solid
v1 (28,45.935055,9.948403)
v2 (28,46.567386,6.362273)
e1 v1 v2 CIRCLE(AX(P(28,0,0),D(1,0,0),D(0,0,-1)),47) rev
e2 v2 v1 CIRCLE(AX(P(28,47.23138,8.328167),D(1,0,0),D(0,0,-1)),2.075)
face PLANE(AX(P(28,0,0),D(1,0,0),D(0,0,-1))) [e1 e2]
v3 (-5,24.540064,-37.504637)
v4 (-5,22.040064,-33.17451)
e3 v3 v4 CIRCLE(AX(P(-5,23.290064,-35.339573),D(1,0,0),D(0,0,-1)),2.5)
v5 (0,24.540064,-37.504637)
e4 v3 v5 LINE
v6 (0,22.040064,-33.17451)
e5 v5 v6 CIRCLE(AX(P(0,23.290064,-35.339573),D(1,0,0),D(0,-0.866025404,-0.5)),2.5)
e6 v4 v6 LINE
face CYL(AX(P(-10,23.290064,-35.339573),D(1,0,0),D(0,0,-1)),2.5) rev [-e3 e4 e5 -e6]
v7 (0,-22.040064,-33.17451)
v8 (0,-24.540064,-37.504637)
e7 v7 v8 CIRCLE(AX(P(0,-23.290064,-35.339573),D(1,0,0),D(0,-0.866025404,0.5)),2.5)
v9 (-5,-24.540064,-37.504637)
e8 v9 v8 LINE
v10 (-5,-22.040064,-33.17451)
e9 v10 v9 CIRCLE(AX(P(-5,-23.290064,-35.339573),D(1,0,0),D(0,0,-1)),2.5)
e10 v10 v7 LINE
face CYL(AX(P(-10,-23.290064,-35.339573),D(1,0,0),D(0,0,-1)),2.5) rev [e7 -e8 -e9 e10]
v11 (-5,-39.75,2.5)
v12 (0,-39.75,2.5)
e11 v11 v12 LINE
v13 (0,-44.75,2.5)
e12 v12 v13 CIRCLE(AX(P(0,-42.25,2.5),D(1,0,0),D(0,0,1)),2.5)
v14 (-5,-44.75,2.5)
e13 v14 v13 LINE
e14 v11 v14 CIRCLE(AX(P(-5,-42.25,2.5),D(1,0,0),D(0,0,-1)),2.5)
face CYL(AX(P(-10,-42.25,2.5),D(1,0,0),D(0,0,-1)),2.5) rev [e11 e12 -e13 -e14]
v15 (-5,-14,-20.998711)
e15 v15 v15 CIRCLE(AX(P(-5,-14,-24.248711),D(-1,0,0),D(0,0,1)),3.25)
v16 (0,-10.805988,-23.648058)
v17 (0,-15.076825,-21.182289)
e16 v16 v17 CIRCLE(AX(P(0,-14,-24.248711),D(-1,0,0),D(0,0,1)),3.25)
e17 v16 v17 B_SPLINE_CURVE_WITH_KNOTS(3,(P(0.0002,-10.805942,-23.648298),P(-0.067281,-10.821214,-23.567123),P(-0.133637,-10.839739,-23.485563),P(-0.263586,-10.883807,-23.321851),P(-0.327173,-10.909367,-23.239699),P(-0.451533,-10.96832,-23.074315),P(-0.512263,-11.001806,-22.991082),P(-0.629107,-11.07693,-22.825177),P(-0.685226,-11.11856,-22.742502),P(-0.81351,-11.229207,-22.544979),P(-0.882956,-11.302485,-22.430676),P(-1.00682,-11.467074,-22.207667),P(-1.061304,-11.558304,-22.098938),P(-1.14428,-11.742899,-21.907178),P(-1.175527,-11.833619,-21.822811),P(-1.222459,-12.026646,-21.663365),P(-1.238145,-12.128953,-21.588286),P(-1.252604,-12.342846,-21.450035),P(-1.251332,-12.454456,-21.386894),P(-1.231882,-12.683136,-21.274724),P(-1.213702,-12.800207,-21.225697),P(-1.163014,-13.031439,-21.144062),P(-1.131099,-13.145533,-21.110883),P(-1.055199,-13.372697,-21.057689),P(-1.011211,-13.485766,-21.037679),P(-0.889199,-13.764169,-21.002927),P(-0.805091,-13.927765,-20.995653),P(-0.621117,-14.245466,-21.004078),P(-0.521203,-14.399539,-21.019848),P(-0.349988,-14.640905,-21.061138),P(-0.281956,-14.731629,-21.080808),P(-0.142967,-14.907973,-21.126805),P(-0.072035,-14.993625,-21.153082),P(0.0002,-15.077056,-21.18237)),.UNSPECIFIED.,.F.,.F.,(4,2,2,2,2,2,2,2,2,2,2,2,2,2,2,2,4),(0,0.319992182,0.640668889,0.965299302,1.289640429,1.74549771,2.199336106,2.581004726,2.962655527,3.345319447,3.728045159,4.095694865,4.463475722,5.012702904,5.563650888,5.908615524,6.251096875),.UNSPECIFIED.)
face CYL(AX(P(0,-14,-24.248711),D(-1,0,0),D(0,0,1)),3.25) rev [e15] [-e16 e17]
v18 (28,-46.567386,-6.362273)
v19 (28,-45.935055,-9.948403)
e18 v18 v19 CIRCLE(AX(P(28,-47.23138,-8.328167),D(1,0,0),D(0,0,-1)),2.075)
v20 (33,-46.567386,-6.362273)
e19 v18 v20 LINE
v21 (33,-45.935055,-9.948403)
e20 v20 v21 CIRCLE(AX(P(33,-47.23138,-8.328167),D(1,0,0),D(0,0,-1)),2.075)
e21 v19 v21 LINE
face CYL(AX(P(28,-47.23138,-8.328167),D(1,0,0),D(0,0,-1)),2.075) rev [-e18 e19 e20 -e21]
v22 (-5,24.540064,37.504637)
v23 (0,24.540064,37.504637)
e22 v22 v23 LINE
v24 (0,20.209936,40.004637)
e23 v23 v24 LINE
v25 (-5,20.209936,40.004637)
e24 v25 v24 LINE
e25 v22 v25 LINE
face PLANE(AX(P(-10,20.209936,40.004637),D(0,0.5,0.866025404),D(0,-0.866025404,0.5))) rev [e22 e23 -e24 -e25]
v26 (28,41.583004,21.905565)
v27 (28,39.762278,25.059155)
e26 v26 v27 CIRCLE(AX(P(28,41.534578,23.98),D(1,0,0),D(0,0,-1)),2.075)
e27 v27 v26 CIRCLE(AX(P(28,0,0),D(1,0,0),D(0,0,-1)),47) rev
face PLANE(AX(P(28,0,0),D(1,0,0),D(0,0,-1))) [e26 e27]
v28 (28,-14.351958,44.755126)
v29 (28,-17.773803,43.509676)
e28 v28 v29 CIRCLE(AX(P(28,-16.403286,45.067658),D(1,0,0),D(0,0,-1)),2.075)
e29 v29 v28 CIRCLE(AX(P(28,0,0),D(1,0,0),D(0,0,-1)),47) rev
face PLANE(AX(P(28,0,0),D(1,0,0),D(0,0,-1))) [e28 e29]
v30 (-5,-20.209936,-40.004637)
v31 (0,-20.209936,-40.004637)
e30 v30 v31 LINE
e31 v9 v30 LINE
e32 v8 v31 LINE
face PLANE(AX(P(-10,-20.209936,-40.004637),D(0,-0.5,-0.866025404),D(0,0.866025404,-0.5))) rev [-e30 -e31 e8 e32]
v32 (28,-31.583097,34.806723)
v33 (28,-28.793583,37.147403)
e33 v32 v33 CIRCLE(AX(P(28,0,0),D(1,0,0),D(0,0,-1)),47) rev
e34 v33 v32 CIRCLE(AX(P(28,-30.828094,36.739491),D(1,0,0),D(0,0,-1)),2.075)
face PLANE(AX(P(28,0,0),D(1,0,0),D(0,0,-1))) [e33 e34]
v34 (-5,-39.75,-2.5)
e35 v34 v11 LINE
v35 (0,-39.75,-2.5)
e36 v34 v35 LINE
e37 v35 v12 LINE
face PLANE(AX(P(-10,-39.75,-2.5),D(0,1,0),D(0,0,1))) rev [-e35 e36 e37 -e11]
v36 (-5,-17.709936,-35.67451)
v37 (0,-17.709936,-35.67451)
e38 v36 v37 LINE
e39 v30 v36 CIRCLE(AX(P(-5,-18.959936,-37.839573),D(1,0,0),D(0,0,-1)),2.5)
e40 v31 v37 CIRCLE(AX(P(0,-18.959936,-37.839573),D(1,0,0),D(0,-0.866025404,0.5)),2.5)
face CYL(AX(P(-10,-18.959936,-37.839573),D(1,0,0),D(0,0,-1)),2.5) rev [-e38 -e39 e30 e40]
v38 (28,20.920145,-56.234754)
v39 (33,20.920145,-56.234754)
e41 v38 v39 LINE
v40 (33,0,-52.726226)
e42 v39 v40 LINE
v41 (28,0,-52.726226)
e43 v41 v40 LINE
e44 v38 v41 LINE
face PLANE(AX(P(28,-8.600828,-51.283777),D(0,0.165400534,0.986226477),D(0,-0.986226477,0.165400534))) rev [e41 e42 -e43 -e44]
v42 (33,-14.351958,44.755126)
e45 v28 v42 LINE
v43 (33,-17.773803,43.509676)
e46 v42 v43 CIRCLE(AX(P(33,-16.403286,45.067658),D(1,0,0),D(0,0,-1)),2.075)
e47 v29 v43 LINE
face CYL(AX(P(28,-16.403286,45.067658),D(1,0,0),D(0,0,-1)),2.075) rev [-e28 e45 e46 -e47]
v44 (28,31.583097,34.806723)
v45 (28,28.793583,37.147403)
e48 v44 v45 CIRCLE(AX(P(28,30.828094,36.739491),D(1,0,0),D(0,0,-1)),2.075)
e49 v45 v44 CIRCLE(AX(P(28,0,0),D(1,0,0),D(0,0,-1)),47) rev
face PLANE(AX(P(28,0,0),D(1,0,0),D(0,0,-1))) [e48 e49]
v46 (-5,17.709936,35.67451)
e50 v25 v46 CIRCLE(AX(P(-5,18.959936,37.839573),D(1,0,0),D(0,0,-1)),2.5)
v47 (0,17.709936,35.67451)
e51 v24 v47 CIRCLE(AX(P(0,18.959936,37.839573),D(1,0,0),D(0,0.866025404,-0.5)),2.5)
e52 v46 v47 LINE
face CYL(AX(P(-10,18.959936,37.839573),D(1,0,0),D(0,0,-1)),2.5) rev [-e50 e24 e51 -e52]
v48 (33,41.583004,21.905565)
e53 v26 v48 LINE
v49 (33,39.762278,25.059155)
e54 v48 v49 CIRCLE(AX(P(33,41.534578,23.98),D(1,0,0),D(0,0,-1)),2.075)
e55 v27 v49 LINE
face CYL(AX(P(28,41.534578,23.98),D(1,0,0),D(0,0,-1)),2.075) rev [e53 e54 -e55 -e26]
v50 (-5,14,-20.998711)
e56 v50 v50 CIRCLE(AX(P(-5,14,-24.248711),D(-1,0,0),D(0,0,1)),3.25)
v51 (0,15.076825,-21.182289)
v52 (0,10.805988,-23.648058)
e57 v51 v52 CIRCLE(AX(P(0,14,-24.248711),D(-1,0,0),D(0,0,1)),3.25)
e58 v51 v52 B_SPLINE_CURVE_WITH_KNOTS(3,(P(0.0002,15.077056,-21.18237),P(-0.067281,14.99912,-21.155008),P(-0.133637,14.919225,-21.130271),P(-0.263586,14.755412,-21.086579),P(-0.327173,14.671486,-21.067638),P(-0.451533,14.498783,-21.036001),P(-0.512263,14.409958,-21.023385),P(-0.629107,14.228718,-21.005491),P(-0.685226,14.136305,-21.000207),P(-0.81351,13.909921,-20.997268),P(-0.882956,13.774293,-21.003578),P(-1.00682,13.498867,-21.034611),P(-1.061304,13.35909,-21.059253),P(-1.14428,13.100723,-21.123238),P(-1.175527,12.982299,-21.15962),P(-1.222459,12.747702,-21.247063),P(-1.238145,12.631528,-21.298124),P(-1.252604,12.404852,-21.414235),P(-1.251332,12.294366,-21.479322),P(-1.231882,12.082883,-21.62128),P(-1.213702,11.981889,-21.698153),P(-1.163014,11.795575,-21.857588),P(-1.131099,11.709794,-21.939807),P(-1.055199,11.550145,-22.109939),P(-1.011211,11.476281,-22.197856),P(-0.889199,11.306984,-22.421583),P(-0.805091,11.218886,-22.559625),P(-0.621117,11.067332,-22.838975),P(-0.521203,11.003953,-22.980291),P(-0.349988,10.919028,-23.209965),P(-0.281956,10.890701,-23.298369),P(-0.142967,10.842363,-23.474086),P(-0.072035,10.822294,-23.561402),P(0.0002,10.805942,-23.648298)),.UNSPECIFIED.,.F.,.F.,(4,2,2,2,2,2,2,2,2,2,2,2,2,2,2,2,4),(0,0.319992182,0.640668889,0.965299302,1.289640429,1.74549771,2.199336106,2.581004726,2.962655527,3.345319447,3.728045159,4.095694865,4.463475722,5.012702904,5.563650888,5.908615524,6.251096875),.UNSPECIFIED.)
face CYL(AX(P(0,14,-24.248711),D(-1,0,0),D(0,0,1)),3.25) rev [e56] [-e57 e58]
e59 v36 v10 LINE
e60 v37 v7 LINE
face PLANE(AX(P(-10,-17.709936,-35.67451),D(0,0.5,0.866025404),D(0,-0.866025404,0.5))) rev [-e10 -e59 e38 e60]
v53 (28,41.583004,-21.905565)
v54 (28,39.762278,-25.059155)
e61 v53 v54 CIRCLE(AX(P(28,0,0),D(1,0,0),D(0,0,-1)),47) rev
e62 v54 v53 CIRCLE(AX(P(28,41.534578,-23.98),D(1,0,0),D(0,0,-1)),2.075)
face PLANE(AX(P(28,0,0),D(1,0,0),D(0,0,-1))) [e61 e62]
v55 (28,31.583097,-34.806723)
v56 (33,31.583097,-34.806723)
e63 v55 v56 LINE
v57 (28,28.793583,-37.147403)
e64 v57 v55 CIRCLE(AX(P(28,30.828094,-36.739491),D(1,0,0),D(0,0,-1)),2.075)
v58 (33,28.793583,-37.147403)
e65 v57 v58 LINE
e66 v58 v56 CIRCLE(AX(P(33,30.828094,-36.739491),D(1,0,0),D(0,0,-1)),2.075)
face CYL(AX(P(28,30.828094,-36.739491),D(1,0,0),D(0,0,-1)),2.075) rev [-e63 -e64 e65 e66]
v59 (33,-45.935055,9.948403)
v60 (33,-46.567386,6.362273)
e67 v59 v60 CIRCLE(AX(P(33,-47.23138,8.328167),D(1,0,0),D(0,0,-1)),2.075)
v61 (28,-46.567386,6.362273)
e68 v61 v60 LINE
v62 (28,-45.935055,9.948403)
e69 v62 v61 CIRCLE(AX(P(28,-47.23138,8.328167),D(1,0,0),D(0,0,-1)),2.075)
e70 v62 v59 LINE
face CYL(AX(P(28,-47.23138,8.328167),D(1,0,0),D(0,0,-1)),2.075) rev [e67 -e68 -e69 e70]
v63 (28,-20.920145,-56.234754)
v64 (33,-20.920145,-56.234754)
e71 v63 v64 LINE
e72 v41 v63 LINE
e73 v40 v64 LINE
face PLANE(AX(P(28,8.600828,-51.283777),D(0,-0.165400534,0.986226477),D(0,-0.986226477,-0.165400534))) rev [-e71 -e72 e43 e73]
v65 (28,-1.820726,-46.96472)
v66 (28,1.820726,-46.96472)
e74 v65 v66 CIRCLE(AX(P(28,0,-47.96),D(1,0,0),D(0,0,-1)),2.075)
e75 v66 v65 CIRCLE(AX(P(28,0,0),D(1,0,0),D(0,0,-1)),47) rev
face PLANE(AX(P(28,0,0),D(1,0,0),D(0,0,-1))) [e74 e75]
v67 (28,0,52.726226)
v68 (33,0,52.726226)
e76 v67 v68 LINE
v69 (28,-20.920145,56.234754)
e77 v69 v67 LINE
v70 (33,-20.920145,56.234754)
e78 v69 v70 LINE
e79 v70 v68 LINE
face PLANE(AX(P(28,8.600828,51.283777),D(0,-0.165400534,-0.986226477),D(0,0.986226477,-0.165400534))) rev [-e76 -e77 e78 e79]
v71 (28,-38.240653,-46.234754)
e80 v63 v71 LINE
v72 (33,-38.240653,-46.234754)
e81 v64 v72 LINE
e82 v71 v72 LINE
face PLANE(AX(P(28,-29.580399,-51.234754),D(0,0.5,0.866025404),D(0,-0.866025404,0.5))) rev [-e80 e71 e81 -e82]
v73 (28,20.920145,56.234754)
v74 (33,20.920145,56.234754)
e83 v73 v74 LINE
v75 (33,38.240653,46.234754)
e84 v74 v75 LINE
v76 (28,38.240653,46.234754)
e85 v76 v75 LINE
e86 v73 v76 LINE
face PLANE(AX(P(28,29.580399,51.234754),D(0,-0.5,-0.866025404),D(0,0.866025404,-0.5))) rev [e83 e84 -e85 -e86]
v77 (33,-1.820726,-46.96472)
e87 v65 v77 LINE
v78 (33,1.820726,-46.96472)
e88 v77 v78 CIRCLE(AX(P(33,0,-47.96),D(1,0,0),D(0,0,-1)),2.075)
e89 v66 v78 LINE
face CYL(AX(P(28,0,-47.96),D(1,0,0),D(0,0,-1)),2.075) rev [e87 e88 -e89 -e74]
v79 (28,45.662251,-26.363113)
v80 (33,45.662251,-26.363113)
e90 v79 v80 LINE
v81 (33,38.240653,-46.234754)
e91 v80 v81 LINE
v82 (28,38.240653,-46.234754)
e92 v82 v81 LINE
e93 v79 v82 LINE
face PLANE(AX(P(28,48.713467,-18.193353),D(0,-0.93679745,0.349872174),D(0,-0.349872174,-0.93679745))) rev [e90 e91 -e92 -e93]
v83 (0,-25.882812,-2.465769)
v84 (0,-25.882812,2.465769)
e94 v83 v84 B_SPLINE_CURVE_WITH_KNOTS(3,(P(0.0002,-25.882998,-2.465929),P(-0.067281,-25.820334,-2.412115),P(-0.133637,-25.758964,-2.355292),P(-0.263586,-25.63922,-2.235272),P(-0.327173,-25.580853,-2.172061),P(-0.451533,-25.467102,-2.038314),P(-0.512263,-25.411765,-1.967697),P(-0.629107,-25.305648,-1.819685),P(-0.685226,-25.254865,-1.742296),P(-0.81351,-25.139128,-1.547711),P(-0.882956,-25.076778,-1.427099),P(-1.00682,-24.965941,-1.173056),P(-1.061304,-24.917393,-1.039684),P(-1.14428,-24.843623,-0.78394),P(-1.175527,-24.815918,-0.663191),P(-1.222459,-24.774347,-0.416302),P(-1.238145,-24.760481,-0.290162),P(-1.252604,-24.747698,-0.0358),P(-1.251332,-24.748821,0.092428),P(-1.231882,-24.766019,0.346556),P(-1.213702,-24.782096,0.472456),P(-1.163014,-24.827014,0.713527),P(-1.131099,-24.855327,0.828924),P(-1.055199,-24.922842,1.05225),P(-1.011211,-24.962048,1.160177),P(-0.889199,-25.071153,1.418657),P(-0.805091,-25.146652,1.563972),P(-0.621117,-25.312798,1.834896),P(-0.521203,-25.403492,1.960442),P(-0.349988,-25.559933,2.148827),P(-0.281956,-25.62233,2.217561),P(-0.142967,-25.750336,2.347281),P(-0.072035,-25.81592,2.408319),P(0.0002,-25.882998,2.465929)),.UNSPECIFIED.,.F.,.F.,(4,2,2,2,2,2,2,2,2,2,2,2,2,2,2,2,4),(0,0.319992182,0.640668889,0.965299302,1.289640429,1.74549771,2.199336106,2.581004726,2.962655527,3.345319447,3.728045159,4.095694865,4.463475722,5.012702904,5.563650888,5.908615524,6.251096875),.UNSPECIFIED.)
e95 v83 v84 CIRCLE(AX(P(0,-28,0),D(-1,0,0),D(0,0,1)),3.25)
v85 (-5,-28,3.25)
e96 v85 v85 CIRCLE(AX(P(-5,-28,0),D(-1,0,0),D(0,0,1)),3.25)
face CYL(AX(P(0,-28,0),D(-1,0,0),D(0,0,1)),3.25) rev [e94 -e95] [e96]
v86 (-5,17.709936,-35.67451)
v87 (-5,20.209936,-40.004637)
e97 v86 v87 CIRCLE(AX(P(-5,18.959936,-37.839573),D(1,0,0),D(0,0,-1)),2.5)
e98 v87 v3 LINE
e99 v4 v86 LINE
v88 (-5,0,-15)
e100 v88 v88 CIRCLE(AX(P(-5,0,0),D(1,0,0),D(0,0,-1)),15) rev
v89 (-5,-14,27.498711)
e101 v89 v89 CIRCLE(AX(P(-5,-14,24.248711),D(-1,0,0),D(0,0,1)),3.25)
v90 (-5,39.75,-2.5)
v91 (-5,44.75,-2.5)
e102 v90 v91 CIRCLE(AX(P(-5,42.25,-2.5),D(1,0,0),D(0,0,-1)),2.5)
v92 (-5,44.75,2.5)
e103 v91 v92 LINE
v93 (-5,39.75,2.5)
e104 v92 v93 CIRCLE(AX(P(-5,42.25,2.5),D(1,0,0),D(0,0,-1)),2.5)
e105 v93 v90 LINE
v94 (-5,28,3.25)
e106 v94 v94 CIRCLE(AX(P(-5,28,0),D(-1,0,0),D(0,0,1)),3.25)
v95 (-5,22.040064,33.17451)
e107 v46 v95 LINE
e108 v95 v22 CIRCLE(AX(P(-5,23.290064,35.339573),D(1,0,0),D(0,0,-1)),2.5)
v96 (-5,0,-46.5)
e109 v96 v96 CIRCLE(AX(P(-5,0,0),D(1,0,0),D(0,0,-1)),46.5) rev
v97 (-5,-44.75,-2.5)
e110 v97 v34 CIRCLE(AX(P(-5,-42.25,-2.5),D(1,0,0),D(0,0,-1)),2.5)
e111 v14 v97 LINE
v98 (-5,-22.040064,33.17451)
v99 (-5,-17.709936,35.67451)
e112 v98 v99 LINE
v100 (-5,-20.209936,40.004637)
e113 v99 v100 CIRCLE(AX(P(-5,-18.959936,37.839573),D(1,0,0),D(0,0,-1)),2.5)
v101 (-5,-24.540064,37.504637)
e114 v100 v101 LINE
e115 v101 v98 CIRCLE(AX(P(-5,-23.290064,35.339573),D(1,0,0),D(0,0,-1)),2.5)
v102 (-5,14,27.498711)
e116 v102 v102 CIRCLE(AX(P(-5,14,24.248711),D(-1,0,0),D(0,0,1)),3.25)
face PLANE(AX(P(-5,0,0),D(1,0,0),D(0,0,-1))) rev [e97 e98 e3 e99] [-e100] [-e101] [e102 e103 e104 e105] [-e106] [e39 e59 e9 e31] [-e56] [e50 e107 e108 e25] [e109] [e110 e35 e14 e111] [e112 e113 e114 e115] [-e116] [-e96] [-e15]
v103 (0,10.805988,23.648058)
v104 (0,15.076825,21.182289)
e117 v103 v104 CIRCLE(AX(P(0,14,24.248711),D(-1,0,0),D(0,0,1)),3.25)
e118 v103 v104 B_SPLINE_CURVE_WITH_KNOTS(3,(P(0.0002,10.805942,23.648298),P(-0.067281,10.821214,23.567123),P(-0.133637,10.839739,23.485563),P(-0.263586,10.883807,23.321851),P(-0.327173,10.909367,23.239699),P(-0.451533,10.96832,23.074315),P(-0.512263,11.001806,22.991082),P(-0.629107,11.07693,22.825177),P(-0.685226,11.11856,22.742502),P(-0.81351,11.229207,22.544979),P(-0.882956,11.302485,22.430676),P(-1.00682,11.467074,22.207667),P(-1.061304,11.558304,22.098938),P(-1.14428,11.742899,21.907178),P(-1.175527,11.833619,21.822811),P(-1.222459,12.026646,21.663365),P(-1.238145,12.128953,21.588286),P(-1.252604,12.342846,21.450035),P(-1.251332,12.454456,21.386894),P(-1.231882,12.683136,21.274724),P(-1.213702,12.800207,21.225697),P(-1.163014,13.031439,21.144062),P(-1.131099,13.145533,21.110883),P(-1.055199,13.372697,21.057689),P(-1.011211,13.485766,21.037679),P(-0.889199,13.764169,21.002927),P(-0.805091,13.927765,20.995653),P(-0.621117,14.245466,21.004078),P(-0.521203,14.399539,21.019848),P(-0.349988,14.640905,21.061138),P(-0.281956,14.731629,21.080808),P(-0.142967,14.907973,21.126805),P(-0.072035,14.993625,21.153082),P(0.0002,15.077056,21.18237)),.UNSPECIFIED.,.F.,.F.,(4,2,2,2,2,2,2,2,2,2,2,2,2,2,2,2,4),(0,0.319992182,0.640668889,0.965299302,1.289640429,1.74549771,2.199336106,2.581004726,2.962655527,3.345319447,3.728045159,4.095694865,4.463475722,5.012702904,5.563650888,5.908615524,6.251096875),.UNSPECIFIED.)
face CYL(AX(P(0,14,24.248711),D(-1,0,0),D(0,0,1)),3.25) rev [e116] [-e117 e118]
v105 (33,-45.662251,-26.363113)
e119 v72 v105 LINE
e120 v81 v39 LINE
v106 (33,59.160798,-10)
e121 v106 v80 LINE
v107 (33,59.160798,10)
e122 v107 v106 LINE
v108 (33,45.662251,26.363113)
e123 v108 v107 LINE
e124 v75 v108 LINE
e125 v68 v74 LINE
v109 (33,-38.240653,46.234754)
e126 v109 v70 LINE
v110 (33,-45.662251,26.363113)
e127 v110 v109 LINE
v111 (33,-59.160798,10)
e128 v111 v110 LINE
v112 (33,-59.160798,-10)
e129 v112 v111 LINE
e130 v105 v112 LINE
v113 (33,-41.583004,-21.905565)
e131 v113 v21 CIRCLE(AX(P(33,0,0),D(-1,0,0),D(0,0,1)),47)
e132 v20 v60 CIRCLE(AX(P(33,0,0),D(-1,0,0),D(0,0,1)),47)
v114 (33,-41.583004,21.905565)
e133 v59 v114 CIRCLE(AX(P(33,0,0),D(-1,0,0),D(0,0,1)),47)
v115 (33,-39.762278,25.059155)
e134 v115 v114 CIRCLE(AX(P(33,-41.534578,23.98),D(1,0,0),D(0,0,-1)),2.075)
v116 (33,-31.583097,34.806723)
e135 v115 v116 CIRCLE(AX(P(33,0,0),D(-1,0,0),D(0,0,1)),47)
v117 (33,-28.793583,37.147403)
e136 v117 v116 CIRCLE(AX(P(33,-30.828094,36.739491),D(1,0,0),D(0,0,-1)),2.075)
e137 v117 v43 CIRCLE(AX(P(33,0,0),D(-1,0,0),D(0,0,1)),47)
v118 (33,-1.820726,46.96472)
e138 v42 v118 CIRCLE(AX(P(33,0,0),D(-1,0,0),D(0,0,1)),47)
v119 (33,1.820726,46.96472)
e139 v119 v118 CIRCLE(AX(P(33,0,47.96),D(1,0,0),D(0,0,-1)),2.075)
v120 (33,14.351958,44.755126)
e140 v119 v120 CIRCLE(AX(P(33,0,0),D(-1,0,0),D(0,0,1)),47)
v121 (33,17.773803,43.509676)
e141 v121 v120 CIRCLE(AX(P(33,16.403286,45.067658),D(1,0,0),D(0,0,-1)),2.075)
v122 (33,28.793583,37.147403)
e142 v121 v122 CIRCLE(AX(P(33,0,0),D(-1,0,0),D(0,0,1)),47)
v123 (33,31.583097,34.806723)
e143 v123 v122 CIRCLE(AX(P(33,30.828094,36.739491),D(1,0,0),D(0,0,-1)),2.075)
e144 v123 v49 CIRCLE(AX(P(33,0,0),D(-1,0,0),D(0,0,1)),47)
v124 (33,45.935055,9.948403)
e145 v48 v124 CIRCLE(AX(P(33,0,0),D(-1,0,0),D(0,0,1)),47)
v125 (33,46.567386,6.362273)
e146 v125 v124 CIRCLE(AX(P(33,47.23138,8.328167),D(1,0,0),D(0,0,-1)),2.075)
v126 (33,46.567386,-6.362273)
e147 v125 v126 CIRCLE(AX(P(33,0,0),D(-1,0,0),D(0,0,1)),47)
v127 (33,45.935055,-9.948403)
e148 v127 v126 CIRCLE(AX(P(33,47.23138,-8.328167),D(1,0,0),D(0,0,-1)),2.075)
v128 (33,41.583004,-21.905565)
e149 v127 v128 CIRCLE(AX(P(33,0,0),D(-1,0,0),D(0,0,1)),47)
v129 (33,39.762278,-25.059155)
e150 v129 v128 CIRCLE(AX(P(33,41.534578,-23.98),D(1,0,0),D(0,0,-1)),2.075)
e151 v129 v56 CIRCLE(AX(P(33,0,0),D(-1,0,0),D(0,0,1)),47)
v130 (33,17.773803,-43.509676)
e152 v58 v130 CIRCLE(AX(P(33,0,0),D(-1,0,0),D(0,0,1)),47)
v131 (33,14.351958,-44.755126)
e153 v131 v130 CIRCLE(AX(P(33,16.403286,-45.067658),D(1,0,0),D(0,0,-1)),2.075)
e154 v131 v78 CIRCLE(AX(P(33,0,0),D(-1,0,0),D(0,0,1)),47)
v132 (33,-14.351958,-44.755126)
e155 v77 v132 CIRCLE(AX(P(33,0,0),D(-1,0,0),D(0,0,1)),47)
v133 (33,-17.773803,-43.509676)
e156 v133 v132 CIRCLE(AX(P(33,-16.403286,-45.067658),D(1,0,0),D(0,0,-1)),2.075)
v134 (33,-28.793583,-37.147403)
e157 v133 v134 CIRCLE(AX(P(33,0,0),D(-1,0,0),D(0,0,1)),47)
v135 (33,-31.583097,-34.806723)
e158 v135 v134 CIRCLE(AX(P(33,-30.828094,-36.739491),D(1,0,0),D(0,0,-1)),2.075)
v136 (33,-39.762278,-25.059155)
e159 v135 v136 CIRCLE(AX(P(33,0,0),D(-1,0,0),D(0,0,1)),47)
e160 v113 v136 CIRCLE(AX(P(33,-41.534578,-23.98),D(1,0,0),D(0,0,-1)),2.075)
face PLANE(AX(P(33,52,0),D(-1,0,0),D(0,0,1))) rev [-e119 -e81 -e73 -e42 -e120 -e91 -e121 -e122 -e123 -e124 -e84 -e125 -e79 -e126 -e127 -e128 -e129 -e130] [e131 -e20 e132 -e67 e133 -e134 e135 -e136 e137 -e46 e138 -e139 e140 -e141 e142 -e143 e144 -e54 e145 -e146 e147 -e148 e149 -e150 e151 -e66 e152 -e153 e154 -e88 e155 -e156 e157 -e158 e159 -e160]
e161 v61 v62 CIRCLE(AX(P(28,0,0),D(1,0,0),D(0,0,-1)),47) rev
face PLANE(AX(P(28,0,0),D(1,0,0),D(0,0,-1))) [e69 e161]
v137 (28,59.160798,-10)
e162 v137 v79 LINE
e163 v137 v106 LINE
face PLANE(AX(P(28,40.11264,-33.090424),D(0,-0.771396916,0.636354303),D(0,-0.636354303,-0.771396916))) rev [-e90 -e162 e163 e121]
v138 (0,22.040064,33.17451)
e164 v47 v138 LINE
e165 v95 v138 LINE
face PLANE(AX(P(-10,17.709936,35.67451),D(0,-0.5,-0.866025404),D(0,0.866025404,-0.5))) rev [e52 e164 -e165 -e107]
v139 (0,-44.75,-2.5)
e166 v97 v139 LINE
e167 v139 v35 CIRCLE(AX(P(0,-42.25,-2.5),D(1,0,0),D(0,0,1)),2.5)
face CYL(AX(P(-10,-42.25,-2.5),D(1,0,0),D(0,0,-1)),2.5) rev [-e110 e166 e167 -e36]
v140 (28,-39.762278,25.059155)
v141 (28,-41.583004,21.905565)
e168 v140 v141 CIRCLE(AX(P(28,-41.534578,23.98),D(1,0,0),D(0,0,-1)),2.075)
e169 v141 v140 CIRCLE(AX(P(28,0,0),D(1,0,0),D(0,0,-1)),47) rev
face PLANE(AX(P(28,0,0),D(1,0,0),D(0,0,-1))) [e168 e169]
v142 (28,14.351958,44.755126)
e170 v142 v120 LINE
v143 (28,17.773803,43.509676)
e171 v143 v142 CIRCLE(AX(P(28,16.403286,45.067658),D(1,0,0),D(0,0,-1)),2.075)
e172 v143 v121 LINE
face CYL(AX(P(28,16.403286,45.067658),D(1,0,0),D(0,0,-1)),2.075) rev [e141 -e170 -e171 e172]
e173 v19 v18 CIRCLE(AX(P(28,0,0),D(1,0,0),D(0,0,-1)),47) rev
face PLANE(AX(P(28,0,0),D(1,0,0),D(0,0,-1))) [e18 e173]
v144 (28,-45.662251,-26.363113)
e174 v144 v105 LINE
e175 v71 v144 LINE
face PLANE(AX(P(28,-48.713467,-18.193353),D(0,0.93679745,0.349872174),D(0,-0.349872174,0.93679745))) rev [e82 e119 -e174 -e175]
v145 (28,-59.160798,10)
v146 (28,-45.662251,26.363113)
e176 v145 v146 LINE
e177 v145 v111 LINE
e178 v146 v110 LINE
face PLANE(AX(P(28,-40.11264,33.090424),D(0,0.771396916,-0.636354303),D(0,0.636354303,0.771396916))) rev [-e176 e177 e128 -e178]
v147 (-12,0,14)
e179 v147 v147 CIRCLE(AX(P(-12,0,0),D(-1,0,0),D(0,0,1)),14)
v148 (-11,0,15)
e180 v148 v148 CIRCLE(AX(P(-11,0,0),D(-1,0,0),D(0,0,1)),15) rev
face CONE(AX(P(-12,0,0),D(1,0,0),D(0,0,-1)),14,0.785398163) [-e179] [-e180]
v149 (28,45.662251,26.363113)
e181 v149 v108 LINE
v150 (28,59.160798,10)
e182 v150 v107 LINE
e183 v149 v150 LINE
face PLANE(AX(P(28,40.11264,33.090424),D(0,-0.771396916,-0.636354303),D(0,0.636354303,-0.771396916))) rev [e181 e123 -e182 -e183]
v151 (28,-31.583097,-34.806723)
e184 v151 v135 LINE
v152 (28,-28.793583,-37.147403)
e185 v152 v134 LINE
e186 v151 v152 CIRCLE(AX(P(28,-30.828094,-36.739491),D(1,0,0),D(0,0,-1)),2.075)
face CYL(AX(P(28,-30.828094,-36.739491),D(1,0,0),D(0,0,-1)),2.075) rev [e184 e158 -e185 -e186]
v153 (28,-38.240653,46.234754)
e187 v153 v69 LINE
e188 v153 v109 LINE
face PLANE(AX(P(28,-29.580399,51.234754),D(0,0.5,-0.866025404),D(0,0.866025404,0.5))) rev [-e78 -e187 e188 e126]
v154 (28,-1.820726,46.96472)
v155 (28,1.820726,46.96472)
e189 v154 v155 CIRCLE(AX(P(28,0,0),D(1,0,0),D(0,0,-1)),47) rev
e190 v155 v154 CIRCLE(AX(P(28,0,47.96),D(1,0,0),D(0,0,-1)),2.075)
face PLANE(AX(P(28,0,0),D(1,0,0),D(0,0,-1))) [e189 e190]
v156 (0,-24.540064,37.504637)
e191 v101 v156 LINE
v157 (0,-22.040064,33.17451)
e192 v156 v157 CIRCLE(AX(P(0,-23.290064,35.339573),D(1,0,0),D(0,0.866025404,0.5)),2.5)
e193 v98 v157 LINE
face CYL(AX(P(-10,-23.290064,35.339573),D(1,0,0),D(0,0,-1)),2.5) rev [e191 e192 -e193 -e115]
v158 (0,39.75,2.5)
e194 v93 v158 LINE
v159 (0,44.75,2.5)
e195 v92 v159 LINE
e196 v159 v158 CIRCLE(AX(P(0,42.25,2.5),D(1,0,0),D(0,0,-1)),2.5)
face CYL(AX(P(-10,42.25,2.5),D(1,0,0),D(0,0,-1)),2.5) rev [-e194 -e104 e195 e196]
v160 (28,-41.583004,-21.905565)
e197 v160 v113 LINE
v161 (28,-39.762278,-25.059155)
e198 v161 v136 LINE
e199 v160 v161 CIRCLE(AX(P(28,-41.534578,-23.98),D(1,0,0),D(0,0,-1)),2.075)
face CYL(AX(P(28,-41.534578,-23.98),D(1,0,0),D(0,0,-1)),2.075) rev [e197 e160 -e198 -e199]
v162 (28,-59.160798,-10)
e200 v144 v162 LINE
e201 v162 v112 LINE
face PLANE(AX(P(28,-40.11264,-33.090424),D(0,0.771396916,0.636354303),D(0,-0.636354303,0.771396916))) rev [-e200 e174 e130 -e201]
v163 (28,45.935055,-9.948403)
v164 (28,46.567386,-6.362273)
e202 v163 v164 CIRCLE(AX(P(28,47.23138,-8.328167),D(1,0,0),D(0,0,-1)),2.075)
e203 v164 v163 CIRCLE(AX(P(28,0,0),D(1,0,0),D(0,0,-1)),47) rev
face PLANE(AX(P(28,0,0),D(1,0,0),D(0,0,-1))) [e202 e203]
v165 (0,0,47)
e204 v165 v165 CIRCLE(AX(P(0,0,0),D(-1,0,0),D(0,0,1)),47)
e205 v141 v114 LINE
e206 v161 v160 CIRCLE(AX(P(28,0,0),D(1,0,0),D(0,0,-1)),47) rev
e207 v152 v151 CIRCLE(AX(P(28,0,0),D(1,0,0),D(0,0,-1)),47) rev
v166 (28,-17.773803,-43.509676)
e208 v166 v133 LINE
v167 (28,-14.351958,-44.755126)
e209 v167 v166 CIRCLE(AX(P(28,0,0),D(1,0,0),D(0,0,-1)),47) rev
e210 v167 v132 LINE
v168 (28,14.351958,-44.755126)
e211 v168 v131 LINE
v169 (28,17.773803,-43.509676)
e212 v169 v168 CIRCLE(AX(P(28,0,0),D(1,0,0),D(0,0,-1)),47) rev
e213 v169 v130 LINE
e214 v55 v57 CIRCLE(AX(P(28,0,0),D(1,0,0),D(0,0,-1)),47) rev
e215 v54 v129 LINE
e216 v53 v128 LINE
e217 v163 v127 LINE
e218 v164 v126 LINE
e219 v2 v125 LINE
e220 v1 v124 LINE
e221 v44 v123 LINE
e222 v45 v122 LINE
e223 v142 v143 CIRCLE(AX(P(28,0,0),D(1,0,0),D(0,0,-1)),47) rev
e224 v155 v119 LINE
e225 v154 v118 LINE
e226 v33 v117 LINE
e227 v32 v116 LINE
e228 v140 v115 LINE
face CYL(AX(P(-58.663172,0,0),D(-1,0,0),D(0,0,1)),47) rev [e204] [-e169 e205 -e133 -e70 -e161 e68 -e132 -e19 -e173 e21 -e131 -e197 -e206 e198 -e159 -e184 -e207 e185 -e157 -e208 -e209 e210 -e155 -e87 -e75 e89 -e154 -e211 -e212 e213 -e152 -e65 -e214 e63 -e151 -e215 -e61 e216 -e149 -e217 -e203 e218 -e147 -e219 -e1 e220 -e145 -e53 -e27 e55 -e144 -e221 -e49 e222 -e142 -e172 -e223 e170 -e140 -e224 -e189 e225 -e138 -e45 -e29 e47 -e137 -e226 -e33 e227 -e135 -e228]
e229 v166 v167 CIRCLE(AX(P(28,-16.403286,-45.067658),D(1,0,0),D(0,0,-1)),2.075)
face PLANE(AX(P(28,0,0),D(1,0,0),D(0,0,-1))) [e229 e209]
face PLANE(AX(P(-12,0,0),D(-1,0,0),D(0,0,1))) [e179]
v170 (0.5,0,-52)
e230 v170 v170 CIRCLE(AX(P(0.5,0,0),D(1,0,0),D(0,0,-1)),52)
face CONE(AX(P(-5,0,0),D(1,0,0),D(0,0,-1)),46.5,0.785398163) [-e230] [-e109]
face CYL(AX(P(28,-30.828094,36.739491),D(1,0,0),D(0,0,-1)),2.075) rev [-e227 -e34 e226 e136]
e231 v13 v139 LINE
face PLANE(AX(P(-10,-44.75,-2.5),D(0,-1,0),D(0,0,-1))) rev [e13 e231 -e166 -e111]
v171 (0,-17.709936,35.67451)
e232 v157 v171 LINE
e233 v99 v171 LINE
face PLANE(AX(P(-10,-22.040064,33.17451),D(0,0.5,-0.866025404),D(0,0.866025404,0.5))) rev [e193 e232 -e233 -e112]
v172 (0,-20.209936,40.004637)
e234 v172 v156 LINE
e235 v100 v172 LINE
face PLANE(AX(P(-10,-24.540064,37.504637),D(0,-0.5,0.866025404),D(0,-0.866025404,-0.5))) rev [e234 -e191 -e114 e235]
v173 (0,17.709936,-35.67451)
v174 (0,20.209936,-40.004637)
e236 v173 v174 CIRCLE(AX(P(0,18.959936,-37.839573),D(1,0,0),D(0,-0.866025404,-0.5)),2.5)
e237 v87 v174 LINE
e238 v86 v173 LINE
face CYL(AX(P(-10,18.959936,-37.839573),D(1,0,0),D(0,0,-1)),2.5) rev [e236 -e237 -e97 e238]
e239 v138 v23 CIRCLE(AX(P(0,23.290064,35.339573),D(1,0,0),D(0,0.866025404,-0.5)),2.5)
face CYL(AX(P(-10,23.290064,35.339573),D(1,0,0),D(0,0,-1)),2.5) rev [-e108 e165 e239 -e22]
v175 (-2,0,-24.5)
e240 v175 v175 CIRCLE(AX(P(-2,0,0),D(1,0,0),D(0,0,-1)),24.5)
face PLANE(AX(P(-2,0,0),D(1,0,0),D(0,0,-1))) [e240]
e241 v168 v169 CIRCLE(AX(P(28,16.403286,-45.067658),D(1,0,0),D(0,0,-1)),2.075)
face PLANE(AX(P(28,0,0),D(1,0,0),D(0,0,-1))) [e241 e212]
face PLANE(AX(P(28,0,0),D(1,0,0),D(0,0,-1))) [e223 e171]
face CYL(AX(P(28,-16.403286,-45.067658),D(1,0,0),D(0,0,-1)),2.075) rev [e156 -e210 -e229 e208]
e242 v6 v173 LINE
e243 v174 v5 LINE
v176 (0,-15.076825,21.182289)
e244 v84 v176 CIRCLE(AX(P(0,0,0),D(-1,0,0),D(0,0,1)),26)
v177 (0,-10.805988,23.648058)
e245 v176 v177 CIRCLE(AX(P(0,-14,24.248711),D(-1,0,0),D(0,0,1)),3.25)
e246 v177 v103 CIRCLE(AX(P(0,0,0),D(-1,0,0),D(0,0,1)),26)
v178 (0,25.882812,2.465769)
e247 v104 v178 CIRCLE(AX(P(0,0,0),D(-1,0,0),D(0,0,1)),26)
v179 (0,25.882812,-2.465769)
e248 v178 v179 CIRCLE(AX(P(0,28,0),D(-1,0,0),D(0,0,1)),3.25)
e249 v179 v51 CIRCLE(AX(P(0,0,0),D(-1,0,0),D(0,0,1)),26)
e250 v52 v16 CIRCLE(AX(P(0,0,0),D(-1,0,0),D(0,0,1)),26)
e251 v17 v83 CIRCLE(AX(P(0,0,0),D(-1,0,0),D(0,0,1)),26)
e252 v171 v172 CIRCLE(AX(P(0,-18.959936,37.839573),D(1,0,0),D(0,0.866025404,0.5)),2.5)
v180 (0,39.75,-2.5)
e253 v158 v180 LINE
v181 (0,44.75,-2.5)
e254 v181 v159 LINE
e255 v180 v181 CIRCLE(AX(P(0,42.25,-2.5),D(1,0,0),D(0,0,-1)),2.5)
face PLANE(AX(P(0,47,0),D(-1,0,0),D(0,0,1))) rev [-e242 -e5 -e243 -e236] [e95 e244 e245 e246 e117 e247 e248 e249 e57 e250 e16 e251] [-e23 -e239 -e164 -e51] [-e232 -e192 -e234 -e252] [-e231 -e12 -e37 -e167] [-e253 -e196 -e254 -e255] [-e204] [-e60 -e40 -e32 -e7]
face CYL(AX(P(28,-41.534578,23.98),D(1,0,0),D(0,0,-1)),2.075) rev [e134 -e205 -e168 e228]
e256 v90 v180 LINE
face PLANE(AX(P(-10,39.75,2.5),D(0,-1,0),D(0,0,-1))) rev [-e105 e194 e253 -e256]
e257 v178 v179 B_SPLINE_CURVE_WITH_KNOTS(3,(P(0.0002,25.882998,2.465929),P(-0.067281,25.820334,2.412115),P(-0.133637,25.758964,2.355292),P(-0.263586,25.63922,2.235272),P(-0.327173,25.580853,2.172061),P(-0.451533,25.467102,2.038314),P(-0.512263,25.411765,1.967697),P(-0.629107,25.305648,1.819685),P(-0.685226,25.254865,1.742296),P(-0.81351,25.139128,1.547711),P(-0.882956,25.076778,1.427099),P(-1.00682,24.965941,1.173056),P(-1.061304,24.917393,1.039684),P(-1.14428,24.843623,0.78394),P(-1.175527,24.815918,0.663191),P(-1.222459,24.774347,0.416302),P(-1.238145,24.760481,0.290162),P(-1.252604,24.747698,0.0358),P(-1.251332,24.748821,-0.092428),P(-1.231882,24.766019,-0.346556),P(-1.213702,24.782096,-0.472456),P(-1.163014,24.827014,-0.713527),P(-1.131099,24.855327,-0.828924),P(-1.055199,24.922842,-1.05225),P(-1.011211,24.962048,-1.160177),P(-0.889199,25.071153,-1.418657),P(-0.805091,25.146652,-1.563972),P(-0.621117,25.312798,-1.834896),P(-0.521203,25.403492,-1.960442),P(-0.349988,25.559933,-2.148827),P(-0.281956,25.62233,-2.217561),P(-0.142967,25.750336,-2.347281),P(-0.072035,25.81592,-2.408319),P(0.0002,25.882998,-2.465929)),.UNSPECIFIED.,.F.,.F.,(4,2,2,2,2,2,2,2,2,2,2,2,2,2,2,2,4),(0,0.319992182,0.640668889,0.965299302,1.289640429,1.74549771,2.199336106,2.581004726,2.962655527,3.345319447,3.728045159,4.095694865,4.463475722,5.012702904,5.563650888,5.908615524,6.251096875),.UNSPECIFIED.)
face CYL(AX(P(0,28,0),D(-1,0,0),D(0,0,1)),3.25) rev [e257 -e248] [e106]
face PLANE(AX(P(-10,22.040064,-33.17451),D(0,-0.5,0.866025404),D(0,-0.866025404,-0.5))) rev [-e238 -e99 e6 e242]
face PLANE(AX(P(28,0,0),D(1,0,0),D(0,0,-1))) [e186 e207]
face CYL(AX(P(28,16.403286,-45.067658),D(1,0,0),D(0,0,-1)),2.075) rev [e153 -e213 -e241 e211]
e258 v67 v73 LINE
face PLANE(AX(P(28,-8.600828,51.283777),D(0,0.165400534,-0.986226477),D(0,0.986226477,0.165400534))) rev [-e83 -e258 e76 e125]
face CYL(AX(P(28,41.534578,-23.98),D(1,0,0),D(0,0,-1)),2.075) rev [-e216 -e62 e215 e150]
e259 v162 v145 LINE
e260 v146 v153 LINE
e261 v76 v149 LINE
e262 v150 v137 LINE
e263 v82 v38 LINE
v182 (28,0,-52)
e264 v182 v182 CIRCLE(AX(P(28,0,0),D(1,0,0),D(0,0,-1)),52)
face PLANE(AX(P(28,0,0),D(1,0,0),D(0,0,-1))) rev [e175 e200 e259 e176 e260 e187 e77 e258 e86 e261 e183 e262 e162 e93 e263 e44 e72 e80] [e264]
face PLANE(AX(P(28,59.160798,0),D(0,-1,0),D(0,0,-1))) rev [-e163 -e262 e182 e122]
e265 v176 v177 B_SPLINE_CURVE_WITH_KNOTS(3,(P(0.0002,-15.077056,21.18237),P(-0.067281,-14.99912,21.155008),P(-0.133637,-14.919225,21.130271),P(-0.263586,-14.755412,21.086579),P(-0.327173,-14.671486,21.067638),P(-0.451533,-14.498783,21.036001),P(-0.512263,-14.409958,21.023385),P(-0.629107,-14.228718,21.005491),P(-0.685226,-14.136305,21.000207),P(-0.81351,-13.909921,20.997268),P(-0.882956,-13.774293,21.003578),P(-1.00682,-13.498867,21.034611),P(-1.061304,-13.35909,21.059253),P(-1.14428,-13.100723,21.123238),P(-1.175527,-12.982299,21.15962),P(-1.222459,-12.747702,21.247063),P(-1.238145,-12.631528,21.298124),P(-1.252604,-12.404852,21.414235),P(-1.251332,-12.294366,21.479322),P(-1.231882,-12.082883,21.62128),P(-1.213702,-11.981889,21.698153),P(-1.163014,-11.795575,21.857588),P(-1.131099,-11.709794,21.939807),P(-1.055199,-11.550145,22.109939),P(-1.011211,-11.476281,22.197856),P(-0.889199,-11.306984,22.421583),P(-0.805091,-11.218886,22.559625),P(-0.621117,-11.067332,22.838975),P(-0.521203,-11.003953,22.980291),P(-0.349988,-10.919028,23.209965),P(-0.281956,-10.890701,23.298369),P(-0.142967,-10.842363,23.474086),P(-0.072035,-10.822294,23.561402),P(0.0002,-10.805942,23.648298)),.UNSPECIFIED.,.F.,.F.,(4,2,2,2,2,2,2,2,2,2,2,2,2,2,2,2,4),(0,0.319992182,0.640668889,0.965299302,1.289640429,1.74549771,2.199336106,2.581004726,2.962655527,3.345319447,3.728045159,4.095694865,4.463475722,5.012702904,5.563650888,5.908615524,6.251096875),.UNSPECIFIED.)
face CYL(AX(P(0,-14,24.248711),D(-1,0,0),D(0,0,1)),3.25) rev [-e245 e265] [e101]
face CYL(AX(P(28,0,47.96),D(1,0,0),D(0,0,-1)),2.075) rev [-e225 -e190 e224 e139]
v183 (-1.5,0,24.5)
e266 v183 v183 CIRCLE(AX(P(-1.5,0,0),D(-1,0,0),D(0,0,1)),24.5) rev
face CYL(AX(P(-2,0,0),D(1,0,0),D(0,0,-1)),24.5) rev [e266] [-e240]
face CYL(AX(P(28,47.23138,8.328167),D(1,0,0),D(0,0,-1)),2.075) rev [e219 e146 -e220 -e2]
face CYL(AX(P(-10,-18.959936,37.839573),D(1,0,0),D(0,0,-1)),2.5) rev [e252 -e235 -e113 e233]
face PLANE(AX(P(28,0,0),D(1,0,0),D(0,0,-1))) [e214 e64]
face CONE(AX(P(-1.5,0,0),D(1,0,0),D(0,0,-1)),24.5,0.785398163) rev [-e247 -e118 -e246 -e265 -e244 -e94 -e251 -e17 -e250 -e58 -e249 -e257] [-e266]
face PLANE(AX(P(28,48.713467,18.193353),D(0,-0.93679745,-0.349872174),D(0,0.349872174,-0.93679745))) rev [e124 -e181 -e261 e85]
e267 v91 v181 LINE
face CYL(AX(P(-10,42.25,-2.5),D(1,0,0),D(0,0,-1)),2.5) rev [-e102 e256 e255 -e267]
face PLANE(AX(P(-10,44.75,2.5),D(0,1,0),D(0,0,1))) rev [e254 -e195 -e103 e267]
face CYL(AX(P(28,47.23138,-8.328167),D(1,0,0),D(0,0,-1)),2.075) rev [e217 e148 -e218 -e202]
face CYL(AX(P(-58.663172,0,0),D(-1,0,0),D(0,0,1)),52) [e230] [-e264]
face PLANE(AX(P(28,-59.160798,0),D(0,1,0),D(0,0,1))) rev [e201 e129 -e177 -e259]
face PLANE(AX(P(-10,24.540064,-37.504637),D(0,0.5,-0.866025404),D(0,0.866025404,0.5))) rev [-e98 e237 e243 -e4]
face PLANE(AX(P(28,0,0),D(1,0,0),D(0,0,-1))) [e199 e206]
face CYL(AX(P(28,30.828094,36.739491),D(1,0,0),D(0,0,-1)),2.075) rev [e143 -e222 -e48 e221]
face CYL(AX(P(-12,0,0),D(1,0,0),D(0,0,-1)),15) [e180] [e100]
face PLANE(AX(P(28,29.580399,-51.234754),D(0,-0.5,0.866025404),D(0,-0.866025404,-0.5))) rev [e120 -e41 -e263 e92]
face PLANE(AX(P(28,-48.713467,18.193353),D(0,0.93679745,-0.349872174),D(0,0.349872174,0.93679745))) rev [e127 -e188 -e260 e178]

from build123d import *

# Parameters (mm, degrees)
SKETCH2_R           = 2.05
CUT_EXTRUDE1_DEPTH  = 10
SKETCH5_R           = 24.5
CUT_EXTRUDE4_DEPTH  = 2
BOSS_EXTRUDE1_DEPTH = 5
CIRPATTERN2_COUNT   = 6
CHAMFER2_SIZE       = 5.5
CHAMFER3_SIZE       = 1.5
SKETCH9_R           = 15
BOSS_EXTRUDE2_DEPTH = 7
CHAMFER4_SIZE       = 1
CUT_EXTRUDE7_START  = -5
CUT_EXTRUDE7_DEPTH  = 5
SKETCH12_R          = 3.25
CUT_EXTRUDE8_DEPTH  = 5


with BuildPart() as part:
    # Sketch1 → Revolve1 (revolve)
    with BuildSketch(Plane.XY, mode=Mode.PRIVATE) as revolve1_sk:
        Polygon((-5, 0), (-5, 52), (33, 52), (33, 47), (0, 47), (0, 0), align=None)
    revolve(revolve1_sk.sketch.rotate(Axis((-58.663171691, 0, 0), (1, 0, 0)), 90), axis=Axis((-58.663171691, 0, 0), (1, 0, 0)))

    # Sketch2 → Cut-Extrude1 (cut)
    with BuildSketch(Plane(origin=(0, 0, 0), x_dir=(0, 0, -1), z_dir=(1, 0, 0))):
        with Locations((0, 28)):
            Circle(SKETCH2_R)
        with Locations((24.248711306, 14)):
            Circle(SKETCH2_R)
        with Locations((24.248711306, -14)):
            Circle(SKETCH2_R)
        with Locations((0, -28)):
            Circle(SKETCH2_R)
        with Locations((-24.248711306, -14)):
            Circle(SKETCH2_R)
        with Locations((-24.248711306, 14)):
            Circle(SKETCH2_R)
        with BuildLine():
            Line((-2.5, 44.75), (2.5, 44.75))
            ThreePointArc((2.5, 44.75), (5, 42.25), (2.5, 39.75))
            Line((2.5, 39.75), (-2.5, 39.75))
            ThreePointArc((-2.5, 39.75), (-5, 42.25), (-2.5, 44.75))
        make_face()
    cut_extrude1 = extrude(amount=-CUT_EXTRUDE1_DEPTH, mode=Mode.SUBTRACT)

    # Sketch5 → Cut-Extrude4 (cut)
    with BuildSketch(Plane(origin=(0, 0, 0), x_dir=(0, 0, -1), z_dir=(1, 0, 0))):
        Circle(SKETCH5_R)
    extrude(amount=-CUT_EXTRUDE4_DEPTH, mode=Mode.SUBTRACT)

    # Sketch6 → Boss-Extrude1 (add)
    with BuildSketch(Plane(origin=(33, 0, 0), x_dir=(0, 0, -1), z_dir=(1, 0, 0))):
        Polygon((-10, 59.160797831), (-26.363112951, 45.662251077), (-46.23475383, 38.240652953), (-56.23475383, 20.920144878), (-52.726225902, 0), (-56.23475383, -20.920144878), (-46.23475383, -38.240652953), (-26.363112951, -45.662251077), (-10, -59.160797831), (10, -59.160797831), (26.363112951, -45.662251077), (46.23475383, -38.240652953), (56.23475383, -20.920144878), (52.726225902, 0), (56.23475383, 20.920144878), (46.23475383, 38.240652953), (26.363112951, 45.662251077), (10, 59.160797831), align=None)
        with BuildLine():
            ThreePointArc((-51.283776788, 8.600827774), (-45.033320997, 26), (-33.09042374, 40.112639613))
            ThreePointArc((-33.09042374, 40.112639613), (-26, 45.033320997), (-18.193353048, 48.713467387))
            ThreePointArc((-18.193353048, 48.713467387), (0, 52), (18.193353048, 48.713467387))
            ThreePointArc((18.193353048, 48.713467387), (26, 45.033320997), (33.09042374, 40.112639613))
            ThreePointArc((33.09042374, 40.112639613), (45.033320997, 26), (51.283776788, 8.600827774))
            ThreePointArc((51.283776788, 8.600827774), (51.820634852, 4.315298776), (52, 0))
            ThreePointArc((52, 0), (51.820634852, -4.315298776), (51.283776788, -8.600827774))
            ThreePointArc((51.283776788, -8.600827774), (45.033320997, -26), (33.09042374, -40.112639613))
            ThreePointArc((33.09042374, -40.112639613), (26, -45.033320997), (18.193353048, -48.713467387))
            ThreePointArc((18.193353048, -48.713467387), (0, -52), (-18.193353048, -48.713467387))
            ThreePointArc((-18.193353048, -48.713467387), (-26, -45.033320997), (-33.09042374, -40.112639613))
            ThreePointArc((-33.09042374, -40.112639613), (-45.033320997, -26), (-51.283776788, -8.600827774))
            ThreePointArc((-51.283776788, -8.600827774), (-52, 0), (-51.283776788, 8.600827774))
        make_face(mode=Mode.SUBTRACT)
    extrude(amount=-BOSS_EXTRUDE1_DEPTH)

    # CirPattern2: Cut-Extrude1 ×6 about axis
    cirpattern2_axis = Axis((0, 0, 0), (1, 0, 0))
    for i in range(1, CIRPATTERN2_COUNT):
        add(cut_extrude1.rotate(cirpattern2_axis, i * 360 / CIRPATTERN2_COUNT), mode=Mode.SUBTRACT)

    # Chamfer2
    chamfer2_edges = [part.edges().sort_by_distance(p)[0] for p in [
        (-5, 0, -52),
    ]]
    chamfer(chamfer2_edges, length=CHAMFER2_SIZE)

    # Chamfer3
    # the kernel refuses this chamfer: 1.5 mm, written as the material it takes off along each edge
    with BuildSketch(Plane(origin=(0, 0, 0), x_dir=(0, 0, -1), z_dir=(0, -1, 0))) as chamfer3_piece_1:
        Polygon((24.5 + CHAMFER3_SIZE, 0), (24.5, -CHAMFER3_SIZE), (24.5, 0), align=None)
    revolve(axis=Axis((0, 0, 0), (1, 0, 0)), mode=Mode.SUBTRACT)

    # Sketch9 → Boss-Extrude2 (add)
    with BuildSketch(Plane.ZY.offset(5)):
        with Locations(Location((0, 0, 0), (0, 0, 180))):
            Circle(SKETCH9_R)
    extrude(amount=BOSS_EXTRUDE2_DEPTH)

    # Chamfer4
    chamfer4_edges = [part.edges().sort_by_distance(p)[0] for p in [
        (-12, 0, 15),
    ]]
    chamfer(chamfer4_edges, length=CHAMFER4_SIZE)

    # Sketch11 → Cut-Extrude7 (cut)
    with BuildSketch(Plane(origin=(33, 0, 0), x_dir=(0, 0, -1), z_dir=(1, 0, 0)).offset(CUT_EXTRUDE7_START)):
        with BuildLine():
            ThreePointArc((-9.948403245, 45.935054946), (-8.16146435, 46.285964392), (-6.362272958, 46.567386472))
            ThreePointArc((-6.362272958, 46.567386472), (-8.68848657, 49.274855922), (-9.948403245, 45.935054946))
        make_face()
        with BuildLine():
            ThreePointArc((9.948403245, 45.935054946), (8.68848657, 49.274855922), (6.362272958, 46.567386472))
            ThreePointArc((6.362272958, 46.567386472), (8.16146435, 46.285964392), (9.948403245, 45.935054946))
        make_face()
        with BuildLine():
            ThreePointArc((25.059155194, 39.762277864), (25.0175, 43.331581078), (21.905565146, 41.583003928))
            ThreePointArc((21.905565146, 41.583003928), (23.5, 40.703193978), (25.059155194, 39.762277864))
        make_face()
        with BuildLine():
            ThreePointArc((37.147403193, 28.793583244), (38.329033711, 32.161878051), (34.806722885, 31.58309741))
            ThreePointArc((34.806722885, 31.58309741), (36.004088827, 30.211017655), (37.147403193, 28.793583244))
        make_face()
        with BuildLine():
            ThreePointArc((44.75512613, 14.351957536), (47.017520281, 17.112977871), (43.509676151, 17.773803228))
            ThreePointArc((43.509676151, 17.773803228), (44.165553177, 16.074946736), (44.75512613, 14.351957536))
        make_face()
        with BuildLine():
            ThreePointArc((46.96472034, -1.820726063), (50.035, 0), (46.96472034, 1.820726063))
            ThreePointArc((46.96472034, 1.820726063), (46.991179257, 0.910533917), (47, 0))
            ThreePointArc((47, 0), (46.991179257, -0.910533917), (46.96472034, -1.820726063))
        make_face()
        with BuildLine():
            ThreePointArc((43.509676151, -17.773803228), (47.017520281, -17.112977871), (44.75512613, -14.351957536))
            ThreePointArc((44.75512613, -14.351957536), (44.165553177, -16.074946736), (43.509676151, -17.773803228))
        make_face()
        with BuildLine():
            ThreePointArc((34.806722885, -31.58309741), (38.329033711, -32.161878051), (37.147403193, -28.793583244))
            ThreePointArc((37.147403193, -28.793583244), (36.004088827, -30.211017655), (34.806722885, -31.58309741))
        make_face()
        with BuildLine():
            ThreePointArc((21.905565146, -41.583003928), (25.0175, -43.331581078), (25.059155194, -39.762277864))
            ThreePointArc((25.059155194, -39.762277864), (23.5, -40.703193978), (21.905565146, -41.583003928))
        make_face()
        with BuildLine():
            ThreePointArc((6.362272958, -46.567386472), (8.68848657, -49.274855922), (9.948403245, -45.935054946))
            ThreePointArc((9.948403245, -45.935054946), (8.16146435, -46.285964392), (6.362272958, -46.567386472))
        make_face()
        with BuildLine():
            ThreePointArc((-6.362272958, -46.567386472), (-8.16146435, -46.285964392), (-9.948403245, -45.935054946))
            ThreePointArc((-9.948403245, -45.935054946), (-8.68848657, -49.274855922), (-6.362272958, -46.567386472))
        make_face()
        with BuildLine():
            ThreePointArc((-21.905565146, -41.583003928), (-23.5, -40.703193978), (-25.059155194, -39.762277864))
            ThreePointArc((-25.059155194, -39.762277864), (-25.0175, -43.331581078), (-21.905565146, -41.583003928))
        make_face()
        with BuildLine():
            ThreePointArc((-34.806722885, -31.58309741), (-36.004088827, -30.211017655), (-37.147403193, -28.793583244))
            ThreePointArc((-37.147403193, -28.793583244), (-38.329033711, -32.161878051), (-34.806722885, -31.58309741))
        make_face()
        with BuildLine():
            ThreePointArc((-43.509676151, -17.773803228), (-44.165553177, -16.074946736), (-44.75512613, -14.351957536))
            ThreePointArc((-44.75512613, -14.351957536), (-47.017520281, -17.112977871), (-43.509676151, -17.773803228))
        make_face()
        with BuildLine():
            ThreePointArc((-46.96472034, -1.820726063), (-47, 0), (-46.96472034, 1.820726063))
            ThreePointArc((-46.96472034, 1.820726063), (-50.035, 0), (-46.96472034, -1.820726063))
        make_face()
        with BuildLine():
            ThreePointArc((-44.75512613, 14.351957536), (-44.165553177, 16.074946736), (-43.509676151, 17.773803228))
            ThreePointArc((-43.509676151, 17.773803228), (-47.017520281, 17.112977871), (-44.75512613, 14.351957536))
        make_face()
        with BuildLine():
            ThreePointArc((-37.147403193, 28.793583244), (-36.004088827, 30.211017655), (-34.806722885, 31.58309741))
            ThreePointArc((-34.806722885, 31.58309741), (-38.329033711, 32.161878051), (-37.147403193, 28.793583244))
        make_face()
        with BuildLine():
            ThreePointArc((-25.059155194, 39.762277864), (-23.5, 40.703193978), (-21.905565146, 41.583003928))
            ThreePointArc((-21.905565146, 41.583003928), (-25.0175, 43.331581078), (-25.059155194, 39.762277864))
        make_face()
    extrude(amount=CUT_EXTRUDE7_DEPTH, mode=Mode.SUBTRACT)

    # Sketch12 → Cut-Extrude8 (cut)
    with BuildSketch(Plane.ZY.offset(5)):
        with Locations((0, 28)):
            Circle(SKETCH12_R)
        with Locations((24.248711306, 14)):
            Circle(SKETCH12_R)
        with Locations((24.248711306, -14)):
            Circle(SKETCH12_R)
        with Locations((0, -28)):
            Circle(SKETCH12_R)
        with Locations((-24.248711306, -14)):
            Circle(SKETCH12_R)
        with Locations((-24.248711306, 14)):
            Circle(SKETCH12_R)
    extrude(amount=-CUT_EXTRUDE8_DEPTH, mode=Mode.SUBTRACT)


solid = part.part
